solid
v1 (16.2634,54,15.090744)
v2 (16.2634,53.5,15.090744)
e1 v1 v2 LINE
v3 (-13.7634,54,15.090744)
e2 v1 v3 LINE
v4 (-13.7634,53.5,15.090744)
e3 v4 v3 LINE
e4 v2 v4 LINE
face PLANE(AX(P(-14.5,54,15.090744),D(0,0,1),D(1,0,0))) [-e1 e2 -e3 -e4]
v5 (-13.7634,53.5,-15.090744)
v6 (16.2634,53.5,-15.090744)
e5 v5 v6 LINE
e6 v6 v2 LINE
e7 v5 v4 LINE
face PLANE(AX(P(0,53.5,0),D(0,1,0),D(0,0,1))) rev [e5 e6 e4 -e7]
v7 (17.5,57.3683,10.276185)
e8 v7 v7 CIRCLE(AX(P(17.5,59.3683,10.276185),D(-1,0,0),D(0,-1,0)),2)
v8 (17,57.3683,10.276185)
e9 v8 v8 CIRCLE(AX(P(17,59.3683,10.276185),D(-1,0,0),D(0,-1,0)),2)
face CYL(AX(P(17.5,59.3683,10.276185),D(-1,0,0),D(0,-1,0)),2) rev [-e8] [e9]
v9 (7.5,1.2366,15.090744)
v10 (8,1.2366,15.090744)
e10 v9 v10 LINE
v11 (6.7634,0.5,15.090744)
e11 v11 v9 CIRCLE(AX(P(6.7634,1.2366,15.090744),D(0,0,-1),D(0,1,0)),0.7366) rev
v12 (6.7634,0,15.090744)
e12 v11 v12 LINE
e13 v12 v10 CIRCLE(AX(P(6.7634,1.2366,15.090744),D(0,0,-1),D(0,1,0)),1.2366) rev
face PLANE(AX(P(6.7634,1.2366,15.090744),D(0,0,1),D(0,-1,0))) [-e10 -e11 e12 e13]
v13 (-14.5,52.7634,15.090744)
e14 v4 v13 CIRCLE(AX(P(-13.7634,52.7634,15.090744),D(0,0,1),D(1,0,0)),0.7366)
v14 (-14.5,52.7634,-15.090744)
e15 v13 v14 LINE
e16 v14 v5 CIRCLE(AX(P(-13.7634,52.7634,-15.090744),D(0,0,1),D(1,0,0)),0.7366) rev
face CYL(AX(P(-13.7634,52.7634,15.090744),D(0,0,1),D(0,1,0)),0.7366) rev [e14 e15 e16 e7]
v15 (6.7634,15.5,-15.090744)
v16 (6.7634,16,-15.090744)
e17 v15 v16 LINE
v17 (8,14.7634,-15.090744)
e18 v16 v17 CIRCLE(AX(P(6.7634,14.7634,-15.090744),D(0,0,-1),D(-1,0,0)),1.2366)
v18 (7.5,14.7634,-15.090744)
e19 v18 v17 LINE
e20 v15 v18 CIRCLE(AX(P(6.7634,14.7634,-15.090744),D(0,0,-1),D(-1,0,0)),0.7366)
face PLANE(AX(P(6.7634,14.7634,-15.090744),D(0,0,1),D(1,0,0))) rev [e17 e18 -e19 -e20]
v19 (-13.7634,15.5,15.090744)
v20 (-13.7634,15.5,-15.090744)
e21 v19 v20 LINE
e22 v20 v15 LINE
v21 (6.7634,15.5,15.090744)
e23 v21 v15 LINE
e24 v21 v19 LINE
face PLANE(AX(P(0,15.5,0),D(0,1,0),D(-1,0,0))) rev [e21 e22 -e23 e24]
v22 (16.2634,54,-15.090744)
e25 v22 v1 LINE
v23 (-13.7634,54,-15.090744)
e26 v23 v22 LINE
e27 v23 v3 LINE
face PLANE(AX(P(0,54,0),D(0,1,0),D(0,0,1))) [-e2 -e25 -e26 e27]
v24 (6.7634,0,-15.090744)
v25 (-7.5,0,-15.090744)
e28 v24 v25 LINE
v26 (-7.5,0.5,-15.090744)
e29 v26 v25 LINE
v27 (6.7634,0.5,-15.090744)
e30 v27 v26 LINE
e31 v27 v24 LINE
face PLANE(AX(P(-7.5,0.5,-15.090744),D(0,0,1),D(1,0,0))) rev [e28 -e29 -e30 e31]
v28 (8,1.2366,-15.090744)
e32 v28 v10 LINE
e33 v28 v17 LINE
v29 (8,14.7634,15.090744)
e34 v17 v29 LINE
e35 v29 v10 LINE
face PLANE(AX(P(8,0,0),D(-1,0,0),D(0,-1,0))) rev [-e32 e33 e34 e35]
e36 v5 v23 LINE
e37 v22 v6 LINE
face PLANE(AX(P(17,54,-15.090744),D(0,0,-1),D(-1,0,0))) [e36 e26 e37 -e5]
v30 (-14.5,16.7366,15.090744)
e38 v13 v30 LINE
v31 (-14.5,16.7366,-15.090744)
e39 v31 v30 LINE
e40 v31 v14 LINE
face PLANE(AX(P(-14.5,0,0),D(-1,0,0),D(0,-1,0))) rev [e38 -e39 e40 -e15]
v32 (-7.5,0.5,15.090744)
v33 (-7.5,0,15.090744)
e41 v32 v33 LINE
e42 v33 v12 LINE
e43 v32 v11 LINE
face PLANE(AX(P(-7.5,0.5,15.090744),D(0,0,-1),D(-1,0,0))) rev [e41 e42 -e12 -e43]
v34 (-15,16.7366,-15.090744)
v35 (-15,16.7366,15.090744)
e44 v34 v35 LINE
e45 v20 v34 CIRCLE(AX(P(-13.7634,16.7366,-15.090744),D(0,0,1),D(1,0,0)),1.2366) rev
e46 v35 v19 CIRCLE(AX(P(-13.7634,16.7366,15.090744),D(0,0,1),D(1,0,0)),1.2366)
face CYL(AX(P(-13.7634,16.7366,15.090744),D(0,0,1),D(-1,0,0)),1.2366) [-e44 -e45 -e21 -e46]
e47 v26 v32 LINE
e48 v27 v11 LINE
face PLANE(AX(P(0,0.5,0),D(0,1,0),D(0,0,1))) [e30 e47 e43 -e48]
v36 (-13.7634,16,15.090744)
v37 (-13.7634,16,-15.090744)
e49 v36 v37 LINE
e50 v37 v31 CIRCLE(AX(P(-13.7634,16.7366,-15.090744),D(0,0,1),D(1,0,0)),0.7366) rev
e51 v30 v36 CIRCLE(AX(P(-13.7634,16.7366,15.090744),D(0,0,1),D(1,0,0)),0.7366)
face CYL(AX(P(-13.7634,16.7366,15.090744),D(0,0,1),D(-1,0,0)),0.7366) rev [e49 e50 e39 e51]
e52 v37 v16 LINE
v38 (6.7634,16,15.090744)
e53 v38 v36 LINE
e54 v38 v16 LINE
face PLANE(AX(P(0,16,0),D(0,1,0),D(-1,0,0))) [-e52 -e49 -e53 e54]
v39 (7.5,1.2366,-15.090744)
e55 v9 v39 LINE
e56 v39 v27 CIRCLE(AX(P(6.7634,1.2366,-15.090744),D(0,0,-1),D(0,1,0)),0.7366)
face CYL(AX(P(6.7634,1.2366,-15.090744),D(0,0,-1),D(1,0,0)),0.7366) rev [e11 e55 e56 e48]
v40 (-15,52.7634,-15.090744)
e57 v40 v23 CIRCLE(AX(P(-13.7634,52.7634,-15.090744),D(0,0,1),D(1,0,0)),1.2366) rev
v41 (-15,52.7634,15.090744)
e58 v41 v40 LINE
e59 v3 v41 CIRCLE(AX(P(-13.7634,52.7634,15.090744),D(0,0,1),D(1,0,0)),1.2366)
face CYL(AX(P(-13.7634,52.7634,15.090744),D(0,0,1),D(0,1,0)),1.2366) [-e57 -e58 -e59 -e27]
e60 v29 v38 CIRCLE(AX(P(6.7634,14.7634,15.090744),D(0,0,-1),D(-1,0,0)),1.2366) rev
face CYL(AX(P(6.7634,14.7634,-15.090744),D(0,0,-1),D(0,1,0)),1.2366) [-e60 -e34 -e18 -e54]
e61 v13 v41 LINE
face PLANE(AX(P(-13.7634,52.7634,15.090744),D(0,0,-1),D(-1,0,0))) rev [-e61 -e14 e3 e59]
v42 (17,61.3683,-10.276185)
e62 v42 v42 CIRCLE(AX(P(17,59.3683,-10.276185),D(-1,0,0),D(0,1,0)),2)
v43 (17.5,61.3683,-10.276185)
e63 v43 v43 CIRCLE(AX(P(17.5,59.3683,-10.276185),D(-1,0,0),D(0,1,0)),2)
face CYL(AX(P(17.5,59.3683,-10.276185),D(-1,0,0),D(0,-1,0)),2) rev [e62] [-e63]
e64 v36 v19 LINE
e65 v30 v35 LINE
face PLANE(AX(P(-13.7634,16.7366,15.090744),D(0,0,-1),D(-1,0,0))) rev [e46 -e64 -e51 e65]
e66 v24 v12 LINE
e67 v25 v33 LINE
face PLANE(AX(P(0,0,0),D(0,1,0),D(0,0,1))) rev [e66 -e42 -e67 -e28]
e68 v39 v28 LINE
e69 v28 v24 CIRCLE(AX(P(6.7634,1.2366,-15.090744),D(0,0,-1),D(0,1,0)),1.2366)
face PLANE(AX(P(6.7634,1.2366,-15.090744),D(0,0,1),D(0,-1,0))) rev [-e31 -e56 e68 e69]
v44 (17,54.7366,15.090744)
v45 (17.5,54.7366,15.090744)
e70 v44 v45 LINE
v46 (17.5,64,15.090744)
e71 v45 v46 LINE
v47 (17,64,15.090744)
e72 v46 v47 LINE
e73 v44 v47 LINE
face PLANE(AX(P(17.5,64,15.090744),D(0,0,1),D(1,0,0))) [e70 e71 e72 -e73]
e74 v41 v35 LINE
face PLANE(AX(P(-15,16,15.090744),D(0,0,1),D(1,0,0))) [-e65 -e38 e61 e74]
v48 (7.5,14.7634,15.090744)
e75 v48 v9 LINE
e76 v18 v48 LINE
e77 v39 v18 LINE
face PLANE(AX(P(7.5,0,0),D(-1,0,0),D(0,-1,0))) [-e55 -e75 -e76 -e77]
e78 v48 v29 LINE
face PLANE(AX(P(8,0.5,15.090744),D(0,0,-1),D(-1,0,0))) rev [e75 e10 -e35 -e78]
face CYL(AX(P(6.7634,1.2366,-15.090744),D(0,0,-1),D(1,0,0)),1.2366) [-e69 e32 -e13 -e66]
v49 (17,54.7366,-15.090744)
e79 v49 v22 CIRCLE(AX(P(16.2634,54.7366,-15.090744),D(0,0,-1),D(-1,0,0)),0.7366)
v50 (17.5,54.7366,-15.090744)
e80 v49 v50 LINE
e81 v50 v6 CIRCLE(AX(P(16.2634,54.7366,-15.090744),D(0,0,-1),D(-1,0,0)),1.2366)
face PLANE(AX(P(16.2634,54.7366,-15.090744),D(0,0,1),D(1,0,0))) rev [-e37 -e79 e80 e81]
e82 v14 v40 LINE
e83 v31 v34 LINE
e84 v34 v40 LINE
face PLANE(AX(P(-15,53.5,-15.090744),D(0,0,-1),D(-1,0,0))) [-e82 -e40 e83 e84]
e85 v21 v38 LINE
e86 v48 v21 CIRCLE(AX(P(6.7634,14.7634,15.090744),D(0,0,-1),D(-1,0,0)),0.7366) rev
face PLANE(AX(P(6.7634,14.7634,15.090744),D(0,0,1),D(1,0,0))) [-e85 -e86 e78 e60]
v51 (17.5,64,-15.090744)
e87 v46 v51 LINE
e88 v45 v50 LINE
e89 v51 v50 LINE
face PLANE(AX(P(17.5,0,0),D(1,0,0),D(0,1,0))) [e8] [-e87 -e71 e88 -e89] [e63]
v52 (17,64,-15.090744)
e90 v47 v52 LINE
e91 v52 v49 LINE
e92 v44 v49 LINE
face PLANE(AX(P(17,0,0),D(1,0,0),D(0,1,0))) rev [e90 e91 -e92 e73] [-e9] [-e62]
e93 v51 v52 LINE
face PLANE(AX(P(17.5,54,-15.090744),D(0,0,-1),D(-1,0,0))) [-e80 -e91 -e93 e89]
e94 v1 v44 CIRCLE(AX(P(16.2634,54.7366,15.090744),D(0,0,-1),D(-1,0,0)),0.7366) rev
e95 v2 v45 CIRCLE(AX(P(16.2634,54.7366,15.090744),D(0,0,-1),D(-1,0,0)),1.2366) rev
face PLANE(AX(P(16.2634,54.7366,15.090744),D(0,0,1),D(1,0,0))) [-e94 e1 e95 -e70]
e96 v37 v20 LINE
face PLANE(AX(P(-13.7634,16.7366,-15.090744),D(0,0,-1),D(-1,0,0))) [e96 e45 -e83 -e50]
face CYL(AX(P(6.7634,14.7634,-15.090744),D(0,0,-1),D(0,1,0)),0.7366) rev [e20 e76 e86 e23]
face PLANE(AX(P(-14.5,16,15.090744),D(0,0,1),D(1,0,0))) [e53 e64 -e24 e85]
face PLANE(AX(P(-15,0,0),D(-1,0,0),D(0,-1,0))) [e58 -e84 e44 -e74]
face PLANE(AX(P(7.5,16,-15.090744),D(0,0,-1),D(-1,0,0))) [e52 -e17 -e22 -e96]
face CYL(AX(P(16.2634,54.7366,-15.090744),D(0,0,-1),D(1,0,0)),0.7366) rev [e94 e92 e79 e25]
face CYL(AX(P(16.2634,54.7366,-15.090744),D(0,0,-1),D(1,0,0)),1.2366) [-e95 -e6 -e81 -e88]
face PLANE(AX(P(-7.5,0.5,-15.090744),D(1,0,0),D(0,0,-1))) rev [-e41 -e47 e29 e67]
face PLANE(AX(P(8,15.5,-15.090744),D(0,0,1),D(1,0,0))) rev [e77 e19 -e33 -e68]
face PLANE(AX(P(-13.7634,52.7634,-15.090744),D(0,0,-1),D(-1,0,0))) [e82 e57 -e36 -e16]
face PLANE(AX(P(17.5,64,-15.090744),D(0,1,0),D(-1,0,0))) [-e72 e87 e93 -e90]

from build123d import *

# Parameters (mm, degrees)
SKETCH1_W                    = 15
SKETCH1_H                    = 30.181487224
BASE_FLANGE2_DEPTH           = 0.5
EDGE_FLANGE1_STRIP_W         = 3.4732
EDGE_FLANGE1_STRIP_H         = 0.5
EDGE_FLANGE1_STRIP_CUT_DEPTH = 30.181487223
EDGE_FLANGE1_DEPTH           = 30.181487223
EDGE_FLANGE2_STRIP_W         = 3.4732
EDGE_FLANGE2_STRIP_H         = 0.5
EDGE_FLANGE2_STRIP_CUT_DEPTH = 30.181487223
EDGE_FLANGE2_DEPTH           = 30.181487223
EDGE_FLANGE6_STRIP_W         = 3.4732
EDGE_FLANGE6_STRIP_H         = 0.5
EDGE_FLANGE6_STRIP_CUT_DEPTH = 30.181487223
EDGE_FLANGE6_DEPTH           = 30.181487223
EDGE_FLANGE7_STRIP_W         = 3.4732
EDGE_FLANGE7_STRIP_H         = 0.5
EDGE_FLANGE7_STRIP_CUT_DEPTH = 30.181487223
EDGE_FLANGE7_DEPTH           = 30.181487223
EDGE_FLANGE8_STRIP_W         = 3.4732
EDGE_FLANGE8_STRIP_H         = 0.5
EDGE_FLANGE8_STRIP_CUT_DEPTH = 30.181487223
EDGE_FLANGE8_DEPTH           = 30.181487223
SKETCH58_R                   = 2
CUT_EXTRUDE1_DEPTH           = 74.128178856


# Sheet-metal steps are written as plain solids
with BuildPart() as part:
    # Sketch1 → Base-Flange2 (new body)
    with BuildSketch(Plane(origin=(0, 0, 0), x_dir=(1, 0, 0), z_dir=(0, 1, 0))):
        Rectangle(SKETCH1_W, SKETCH1_H)
    extrude(amount=BASE_FLANGE2_DEPTH)

    # Edge-Flange1 strip (across the edge) → Edge-Flange1 strip cut (cut)
    with BuildSketch(Plane(origin=(7.5, 0.5, 15.090743612), x_dir=(-1, 0, 0), z_dir=(0, 0, -1))):
        with Locations((-1, -0.25)):
            Rectangle(EDGE_FLANGE1_STRIP_W, EDGE_FLANGE1_STRIP_H)
    extrude(amount=EDGE_FLANGE1_STRIP_CUT_DEPTH, mode=Mode.SUBTRACT)

    # Edge-Flange1 section (across the edge) → Edge-Flange1 (add)
    with BuildSketch(Plane(origin=(7.5, 0.5, 15.090743612), x_dir=(-1, 0, 0), z_dir=(0, 0, -1))):
        with BuildLine():
            Line((-0.5, 0.7366), (-0.5, 15))
            Line((-0.5, 15), (0, 15))
            Line((0, 15), (0, 0.7366))
            ThreePointArc((0, 0.7366), (0.215745145, 0.215745145), (0.7366, 0))
            Line((0.7366, 0), (0.7366, -0.5))
            ThreePointArc((0.7366, -0.5), (-0.137808246, -0.137808246), (-0.5, 0.7366))
        make_face()
    extrude(amount=EDGE_FLANGE1_DEPTH)

    # Edge-Flange2 strip (across the edge) → Edge-Flange2 strip cut (cut)
    with BuildSketch(Plane(origin=(7.5, 15.5, 15.090743612), x_dir=(0, -1, 0), z_dir=(0, 0, -1))):
        with Locations((-1, -0.25)):
            Rectangle(EDGE_FLANGE2_STRIP_W, EDGE_FLANGE2_STRIP_H)
    extrude(amount=EDGE_FLANGE2_STRIP_CUT_DEPTH, mode=Mode.SUBTRACT)

    # Edge-Flange2 section (across the edge) → Edge-Flange2 (add)
    with BuildSketch(Plane(origin=(7.5, 15.5, 15.090743612), x_dir=(0, -1, 0), z_dir=(0, 0, -1))):
        with BuildLine():
            Line((-0.5, 0.7366), (-0.5, 22))
            Line((-0.5, 22), (0, 22))
            Line((0, 22), (0, 0.7366))
            ThreePointArc((0, 0.7366), (0.215745145, 0.215745145), (0.7366, 0))
            Line((0.7366, 0), (0.7366, -0.5))
            ThreePointArc((0.7366, -0.5), (-0.137808246, -0.137808246), (-0.5, 0.7366))
        make_face()
    extrude(amount=EDGE_FLANGE2_DEPTH)

    # Edge-Flange6 strip (across the edge) → Edge-Flange6 strip cut (cut)
    with BuildSketch(Plane(origin=(-14.5, 16, -15.090743612), x_dir=(1, 0, 0), z_dir=(0, 0, 1))):
        with Locations((-1, -0.25)):
            Rectangle(EDGE_FLANGE6_STRIP_W, EDGE_FLANGE6_STRIP_H)
    extrude(amount=EDGE_FLANGE6_STRIP_CUT_DEPTH, mode=Mode.SUBTRACT)

    # Edge-Flange6 section (across the edge) → Edge-Flange6 (add)
    with BuildSketch(Plane(origin=(-14.5, 16, -15.090743612), x_dir=(1, 0, 0), z_dir=(0, 0, 1))):
        with BuildLine():
            Line((-0.5, 0.7366), (-0.5, 37.5))
            Line((-0.5, 37.5), (0, 37.5))
            Line((0, 37.5), (0, 0.7366))
            ThreePointArc((0, 0.7366), (0.215745145, 0.215745145), (0.7366, 0))
            Line((0.7366, 0), (0.7366, -0.5))
            ThreePointArc((0.7366, -0.5), (-0.137808246, -0.137808246), (-0.5, 0.7366))
        make_face()
    extrude(amount=EDGE_FLANGE6_DEPTH)

    # Edge-Flange7 strip (across the edge) → Edge-Flange7 strip cut (cut)
    with BuildSketch(Plane(origin=(-14.5, 53.5, -15.090743612), x_dir=(0, -1, 0), z_dir=(0, 0, 1))):
        with Locations((-1, -0.25)):
            Rectangle(EDGE_FLANGE7_STRIP_W, EDGE_FLANGE7_STRIP_H)
    extrude(amount=EDGE_FLANGE7_STRIP_CUT_DEPTH, mode=Mode.SUBTRACT)

    # Edge-Flange7 section (across the edge) → Edge-Flange7 (add)
    with BuildSketch(Plane(origin=(-14.5, 53.5, -15.090743612), x_dir=(0, -1, 0), z_dir=(0, 0, 1))):
        with BuildLine():
            Line((-0.5, 0.7366), (-0.5, 31.5))
            Line((-0.5, 31.5), (0, 31.5))
            Line((0, 31.5), (0, 0.7366))
            ThreePointArc((0, 0.7366), (0.215745145, 0.215745145), (0.7366, 0))
            Line((0.7366, 0), (0.7366, -0.5))
            ThreePointArc((0.7366, -0.5), (-0.137808246, -0.137808246), (-0.5, 0.7366))
        make_face()
    extrude(amount=EDGE_FLANGE7_DEPTH)

    # Edge-Flange8 strip (across the edge) → Edge-Flange8 strip cut (cut)
    with BuildSketch(Plane(origin=(17, 54, 15.090743612), x_dir=(-1, 0, 0), z_dir=(0, 0, -1))):
        with Locations((-1, -0.25)):
            Rectangle(EDGE_FLANGE8_STRIP_W, EDGE_FLANGE8_STRIP_H)
    extrude(amount=EDGE_FLANGE8_STRIP_CUT_DEPTH, mode=Mode.SUBTRACT)

    # Edge-Flange8 section (across the edge) → Edge-Flange8 (add)
    with BuildSketch(Plane(origin=(17, 54, 15.090743612), x_dir=(-1, 0, 0), z_dir=(0, 0, -1))):
        with BuildLine():
            Line((-0.5, 0.7366), (-0.5, 10))
            Line((-0.5, 10), (0, 10))
            Line((0, 10), (0, 0.7366))
            ThreePointArc((0, 0.7366), (0.215745145, 0.215745145), (0.7366, 0))
            Line((0.7366, 0), (0.7366, -0.5))
            ThreePointArc((0.7366, -0.5), (-0.137808246, -0.137808246), (-0.5, 0.7366))
        make_face()
    extrude(amount=EDGE_FLANGE8_DEPTH)

    # Sketch58 → Cut-Extrude1 (cut, through all)
    with BuildSketch(Plane.ZY.offset(-17)):
        with Locations(Location((10.276185244, 59.3683, 0), (0, 0, 270))):
            Circle(SKETCH58_R)
        with Locations(Location((-10.276185244, 59.3683, 0), (0, 0, 90))):
            Circle(SKETCH58_R)
    extrude(amount=-CUT_EXTRUDE1_DEPTH, mode=Mode.SUBTRACT)


solid = part.part
